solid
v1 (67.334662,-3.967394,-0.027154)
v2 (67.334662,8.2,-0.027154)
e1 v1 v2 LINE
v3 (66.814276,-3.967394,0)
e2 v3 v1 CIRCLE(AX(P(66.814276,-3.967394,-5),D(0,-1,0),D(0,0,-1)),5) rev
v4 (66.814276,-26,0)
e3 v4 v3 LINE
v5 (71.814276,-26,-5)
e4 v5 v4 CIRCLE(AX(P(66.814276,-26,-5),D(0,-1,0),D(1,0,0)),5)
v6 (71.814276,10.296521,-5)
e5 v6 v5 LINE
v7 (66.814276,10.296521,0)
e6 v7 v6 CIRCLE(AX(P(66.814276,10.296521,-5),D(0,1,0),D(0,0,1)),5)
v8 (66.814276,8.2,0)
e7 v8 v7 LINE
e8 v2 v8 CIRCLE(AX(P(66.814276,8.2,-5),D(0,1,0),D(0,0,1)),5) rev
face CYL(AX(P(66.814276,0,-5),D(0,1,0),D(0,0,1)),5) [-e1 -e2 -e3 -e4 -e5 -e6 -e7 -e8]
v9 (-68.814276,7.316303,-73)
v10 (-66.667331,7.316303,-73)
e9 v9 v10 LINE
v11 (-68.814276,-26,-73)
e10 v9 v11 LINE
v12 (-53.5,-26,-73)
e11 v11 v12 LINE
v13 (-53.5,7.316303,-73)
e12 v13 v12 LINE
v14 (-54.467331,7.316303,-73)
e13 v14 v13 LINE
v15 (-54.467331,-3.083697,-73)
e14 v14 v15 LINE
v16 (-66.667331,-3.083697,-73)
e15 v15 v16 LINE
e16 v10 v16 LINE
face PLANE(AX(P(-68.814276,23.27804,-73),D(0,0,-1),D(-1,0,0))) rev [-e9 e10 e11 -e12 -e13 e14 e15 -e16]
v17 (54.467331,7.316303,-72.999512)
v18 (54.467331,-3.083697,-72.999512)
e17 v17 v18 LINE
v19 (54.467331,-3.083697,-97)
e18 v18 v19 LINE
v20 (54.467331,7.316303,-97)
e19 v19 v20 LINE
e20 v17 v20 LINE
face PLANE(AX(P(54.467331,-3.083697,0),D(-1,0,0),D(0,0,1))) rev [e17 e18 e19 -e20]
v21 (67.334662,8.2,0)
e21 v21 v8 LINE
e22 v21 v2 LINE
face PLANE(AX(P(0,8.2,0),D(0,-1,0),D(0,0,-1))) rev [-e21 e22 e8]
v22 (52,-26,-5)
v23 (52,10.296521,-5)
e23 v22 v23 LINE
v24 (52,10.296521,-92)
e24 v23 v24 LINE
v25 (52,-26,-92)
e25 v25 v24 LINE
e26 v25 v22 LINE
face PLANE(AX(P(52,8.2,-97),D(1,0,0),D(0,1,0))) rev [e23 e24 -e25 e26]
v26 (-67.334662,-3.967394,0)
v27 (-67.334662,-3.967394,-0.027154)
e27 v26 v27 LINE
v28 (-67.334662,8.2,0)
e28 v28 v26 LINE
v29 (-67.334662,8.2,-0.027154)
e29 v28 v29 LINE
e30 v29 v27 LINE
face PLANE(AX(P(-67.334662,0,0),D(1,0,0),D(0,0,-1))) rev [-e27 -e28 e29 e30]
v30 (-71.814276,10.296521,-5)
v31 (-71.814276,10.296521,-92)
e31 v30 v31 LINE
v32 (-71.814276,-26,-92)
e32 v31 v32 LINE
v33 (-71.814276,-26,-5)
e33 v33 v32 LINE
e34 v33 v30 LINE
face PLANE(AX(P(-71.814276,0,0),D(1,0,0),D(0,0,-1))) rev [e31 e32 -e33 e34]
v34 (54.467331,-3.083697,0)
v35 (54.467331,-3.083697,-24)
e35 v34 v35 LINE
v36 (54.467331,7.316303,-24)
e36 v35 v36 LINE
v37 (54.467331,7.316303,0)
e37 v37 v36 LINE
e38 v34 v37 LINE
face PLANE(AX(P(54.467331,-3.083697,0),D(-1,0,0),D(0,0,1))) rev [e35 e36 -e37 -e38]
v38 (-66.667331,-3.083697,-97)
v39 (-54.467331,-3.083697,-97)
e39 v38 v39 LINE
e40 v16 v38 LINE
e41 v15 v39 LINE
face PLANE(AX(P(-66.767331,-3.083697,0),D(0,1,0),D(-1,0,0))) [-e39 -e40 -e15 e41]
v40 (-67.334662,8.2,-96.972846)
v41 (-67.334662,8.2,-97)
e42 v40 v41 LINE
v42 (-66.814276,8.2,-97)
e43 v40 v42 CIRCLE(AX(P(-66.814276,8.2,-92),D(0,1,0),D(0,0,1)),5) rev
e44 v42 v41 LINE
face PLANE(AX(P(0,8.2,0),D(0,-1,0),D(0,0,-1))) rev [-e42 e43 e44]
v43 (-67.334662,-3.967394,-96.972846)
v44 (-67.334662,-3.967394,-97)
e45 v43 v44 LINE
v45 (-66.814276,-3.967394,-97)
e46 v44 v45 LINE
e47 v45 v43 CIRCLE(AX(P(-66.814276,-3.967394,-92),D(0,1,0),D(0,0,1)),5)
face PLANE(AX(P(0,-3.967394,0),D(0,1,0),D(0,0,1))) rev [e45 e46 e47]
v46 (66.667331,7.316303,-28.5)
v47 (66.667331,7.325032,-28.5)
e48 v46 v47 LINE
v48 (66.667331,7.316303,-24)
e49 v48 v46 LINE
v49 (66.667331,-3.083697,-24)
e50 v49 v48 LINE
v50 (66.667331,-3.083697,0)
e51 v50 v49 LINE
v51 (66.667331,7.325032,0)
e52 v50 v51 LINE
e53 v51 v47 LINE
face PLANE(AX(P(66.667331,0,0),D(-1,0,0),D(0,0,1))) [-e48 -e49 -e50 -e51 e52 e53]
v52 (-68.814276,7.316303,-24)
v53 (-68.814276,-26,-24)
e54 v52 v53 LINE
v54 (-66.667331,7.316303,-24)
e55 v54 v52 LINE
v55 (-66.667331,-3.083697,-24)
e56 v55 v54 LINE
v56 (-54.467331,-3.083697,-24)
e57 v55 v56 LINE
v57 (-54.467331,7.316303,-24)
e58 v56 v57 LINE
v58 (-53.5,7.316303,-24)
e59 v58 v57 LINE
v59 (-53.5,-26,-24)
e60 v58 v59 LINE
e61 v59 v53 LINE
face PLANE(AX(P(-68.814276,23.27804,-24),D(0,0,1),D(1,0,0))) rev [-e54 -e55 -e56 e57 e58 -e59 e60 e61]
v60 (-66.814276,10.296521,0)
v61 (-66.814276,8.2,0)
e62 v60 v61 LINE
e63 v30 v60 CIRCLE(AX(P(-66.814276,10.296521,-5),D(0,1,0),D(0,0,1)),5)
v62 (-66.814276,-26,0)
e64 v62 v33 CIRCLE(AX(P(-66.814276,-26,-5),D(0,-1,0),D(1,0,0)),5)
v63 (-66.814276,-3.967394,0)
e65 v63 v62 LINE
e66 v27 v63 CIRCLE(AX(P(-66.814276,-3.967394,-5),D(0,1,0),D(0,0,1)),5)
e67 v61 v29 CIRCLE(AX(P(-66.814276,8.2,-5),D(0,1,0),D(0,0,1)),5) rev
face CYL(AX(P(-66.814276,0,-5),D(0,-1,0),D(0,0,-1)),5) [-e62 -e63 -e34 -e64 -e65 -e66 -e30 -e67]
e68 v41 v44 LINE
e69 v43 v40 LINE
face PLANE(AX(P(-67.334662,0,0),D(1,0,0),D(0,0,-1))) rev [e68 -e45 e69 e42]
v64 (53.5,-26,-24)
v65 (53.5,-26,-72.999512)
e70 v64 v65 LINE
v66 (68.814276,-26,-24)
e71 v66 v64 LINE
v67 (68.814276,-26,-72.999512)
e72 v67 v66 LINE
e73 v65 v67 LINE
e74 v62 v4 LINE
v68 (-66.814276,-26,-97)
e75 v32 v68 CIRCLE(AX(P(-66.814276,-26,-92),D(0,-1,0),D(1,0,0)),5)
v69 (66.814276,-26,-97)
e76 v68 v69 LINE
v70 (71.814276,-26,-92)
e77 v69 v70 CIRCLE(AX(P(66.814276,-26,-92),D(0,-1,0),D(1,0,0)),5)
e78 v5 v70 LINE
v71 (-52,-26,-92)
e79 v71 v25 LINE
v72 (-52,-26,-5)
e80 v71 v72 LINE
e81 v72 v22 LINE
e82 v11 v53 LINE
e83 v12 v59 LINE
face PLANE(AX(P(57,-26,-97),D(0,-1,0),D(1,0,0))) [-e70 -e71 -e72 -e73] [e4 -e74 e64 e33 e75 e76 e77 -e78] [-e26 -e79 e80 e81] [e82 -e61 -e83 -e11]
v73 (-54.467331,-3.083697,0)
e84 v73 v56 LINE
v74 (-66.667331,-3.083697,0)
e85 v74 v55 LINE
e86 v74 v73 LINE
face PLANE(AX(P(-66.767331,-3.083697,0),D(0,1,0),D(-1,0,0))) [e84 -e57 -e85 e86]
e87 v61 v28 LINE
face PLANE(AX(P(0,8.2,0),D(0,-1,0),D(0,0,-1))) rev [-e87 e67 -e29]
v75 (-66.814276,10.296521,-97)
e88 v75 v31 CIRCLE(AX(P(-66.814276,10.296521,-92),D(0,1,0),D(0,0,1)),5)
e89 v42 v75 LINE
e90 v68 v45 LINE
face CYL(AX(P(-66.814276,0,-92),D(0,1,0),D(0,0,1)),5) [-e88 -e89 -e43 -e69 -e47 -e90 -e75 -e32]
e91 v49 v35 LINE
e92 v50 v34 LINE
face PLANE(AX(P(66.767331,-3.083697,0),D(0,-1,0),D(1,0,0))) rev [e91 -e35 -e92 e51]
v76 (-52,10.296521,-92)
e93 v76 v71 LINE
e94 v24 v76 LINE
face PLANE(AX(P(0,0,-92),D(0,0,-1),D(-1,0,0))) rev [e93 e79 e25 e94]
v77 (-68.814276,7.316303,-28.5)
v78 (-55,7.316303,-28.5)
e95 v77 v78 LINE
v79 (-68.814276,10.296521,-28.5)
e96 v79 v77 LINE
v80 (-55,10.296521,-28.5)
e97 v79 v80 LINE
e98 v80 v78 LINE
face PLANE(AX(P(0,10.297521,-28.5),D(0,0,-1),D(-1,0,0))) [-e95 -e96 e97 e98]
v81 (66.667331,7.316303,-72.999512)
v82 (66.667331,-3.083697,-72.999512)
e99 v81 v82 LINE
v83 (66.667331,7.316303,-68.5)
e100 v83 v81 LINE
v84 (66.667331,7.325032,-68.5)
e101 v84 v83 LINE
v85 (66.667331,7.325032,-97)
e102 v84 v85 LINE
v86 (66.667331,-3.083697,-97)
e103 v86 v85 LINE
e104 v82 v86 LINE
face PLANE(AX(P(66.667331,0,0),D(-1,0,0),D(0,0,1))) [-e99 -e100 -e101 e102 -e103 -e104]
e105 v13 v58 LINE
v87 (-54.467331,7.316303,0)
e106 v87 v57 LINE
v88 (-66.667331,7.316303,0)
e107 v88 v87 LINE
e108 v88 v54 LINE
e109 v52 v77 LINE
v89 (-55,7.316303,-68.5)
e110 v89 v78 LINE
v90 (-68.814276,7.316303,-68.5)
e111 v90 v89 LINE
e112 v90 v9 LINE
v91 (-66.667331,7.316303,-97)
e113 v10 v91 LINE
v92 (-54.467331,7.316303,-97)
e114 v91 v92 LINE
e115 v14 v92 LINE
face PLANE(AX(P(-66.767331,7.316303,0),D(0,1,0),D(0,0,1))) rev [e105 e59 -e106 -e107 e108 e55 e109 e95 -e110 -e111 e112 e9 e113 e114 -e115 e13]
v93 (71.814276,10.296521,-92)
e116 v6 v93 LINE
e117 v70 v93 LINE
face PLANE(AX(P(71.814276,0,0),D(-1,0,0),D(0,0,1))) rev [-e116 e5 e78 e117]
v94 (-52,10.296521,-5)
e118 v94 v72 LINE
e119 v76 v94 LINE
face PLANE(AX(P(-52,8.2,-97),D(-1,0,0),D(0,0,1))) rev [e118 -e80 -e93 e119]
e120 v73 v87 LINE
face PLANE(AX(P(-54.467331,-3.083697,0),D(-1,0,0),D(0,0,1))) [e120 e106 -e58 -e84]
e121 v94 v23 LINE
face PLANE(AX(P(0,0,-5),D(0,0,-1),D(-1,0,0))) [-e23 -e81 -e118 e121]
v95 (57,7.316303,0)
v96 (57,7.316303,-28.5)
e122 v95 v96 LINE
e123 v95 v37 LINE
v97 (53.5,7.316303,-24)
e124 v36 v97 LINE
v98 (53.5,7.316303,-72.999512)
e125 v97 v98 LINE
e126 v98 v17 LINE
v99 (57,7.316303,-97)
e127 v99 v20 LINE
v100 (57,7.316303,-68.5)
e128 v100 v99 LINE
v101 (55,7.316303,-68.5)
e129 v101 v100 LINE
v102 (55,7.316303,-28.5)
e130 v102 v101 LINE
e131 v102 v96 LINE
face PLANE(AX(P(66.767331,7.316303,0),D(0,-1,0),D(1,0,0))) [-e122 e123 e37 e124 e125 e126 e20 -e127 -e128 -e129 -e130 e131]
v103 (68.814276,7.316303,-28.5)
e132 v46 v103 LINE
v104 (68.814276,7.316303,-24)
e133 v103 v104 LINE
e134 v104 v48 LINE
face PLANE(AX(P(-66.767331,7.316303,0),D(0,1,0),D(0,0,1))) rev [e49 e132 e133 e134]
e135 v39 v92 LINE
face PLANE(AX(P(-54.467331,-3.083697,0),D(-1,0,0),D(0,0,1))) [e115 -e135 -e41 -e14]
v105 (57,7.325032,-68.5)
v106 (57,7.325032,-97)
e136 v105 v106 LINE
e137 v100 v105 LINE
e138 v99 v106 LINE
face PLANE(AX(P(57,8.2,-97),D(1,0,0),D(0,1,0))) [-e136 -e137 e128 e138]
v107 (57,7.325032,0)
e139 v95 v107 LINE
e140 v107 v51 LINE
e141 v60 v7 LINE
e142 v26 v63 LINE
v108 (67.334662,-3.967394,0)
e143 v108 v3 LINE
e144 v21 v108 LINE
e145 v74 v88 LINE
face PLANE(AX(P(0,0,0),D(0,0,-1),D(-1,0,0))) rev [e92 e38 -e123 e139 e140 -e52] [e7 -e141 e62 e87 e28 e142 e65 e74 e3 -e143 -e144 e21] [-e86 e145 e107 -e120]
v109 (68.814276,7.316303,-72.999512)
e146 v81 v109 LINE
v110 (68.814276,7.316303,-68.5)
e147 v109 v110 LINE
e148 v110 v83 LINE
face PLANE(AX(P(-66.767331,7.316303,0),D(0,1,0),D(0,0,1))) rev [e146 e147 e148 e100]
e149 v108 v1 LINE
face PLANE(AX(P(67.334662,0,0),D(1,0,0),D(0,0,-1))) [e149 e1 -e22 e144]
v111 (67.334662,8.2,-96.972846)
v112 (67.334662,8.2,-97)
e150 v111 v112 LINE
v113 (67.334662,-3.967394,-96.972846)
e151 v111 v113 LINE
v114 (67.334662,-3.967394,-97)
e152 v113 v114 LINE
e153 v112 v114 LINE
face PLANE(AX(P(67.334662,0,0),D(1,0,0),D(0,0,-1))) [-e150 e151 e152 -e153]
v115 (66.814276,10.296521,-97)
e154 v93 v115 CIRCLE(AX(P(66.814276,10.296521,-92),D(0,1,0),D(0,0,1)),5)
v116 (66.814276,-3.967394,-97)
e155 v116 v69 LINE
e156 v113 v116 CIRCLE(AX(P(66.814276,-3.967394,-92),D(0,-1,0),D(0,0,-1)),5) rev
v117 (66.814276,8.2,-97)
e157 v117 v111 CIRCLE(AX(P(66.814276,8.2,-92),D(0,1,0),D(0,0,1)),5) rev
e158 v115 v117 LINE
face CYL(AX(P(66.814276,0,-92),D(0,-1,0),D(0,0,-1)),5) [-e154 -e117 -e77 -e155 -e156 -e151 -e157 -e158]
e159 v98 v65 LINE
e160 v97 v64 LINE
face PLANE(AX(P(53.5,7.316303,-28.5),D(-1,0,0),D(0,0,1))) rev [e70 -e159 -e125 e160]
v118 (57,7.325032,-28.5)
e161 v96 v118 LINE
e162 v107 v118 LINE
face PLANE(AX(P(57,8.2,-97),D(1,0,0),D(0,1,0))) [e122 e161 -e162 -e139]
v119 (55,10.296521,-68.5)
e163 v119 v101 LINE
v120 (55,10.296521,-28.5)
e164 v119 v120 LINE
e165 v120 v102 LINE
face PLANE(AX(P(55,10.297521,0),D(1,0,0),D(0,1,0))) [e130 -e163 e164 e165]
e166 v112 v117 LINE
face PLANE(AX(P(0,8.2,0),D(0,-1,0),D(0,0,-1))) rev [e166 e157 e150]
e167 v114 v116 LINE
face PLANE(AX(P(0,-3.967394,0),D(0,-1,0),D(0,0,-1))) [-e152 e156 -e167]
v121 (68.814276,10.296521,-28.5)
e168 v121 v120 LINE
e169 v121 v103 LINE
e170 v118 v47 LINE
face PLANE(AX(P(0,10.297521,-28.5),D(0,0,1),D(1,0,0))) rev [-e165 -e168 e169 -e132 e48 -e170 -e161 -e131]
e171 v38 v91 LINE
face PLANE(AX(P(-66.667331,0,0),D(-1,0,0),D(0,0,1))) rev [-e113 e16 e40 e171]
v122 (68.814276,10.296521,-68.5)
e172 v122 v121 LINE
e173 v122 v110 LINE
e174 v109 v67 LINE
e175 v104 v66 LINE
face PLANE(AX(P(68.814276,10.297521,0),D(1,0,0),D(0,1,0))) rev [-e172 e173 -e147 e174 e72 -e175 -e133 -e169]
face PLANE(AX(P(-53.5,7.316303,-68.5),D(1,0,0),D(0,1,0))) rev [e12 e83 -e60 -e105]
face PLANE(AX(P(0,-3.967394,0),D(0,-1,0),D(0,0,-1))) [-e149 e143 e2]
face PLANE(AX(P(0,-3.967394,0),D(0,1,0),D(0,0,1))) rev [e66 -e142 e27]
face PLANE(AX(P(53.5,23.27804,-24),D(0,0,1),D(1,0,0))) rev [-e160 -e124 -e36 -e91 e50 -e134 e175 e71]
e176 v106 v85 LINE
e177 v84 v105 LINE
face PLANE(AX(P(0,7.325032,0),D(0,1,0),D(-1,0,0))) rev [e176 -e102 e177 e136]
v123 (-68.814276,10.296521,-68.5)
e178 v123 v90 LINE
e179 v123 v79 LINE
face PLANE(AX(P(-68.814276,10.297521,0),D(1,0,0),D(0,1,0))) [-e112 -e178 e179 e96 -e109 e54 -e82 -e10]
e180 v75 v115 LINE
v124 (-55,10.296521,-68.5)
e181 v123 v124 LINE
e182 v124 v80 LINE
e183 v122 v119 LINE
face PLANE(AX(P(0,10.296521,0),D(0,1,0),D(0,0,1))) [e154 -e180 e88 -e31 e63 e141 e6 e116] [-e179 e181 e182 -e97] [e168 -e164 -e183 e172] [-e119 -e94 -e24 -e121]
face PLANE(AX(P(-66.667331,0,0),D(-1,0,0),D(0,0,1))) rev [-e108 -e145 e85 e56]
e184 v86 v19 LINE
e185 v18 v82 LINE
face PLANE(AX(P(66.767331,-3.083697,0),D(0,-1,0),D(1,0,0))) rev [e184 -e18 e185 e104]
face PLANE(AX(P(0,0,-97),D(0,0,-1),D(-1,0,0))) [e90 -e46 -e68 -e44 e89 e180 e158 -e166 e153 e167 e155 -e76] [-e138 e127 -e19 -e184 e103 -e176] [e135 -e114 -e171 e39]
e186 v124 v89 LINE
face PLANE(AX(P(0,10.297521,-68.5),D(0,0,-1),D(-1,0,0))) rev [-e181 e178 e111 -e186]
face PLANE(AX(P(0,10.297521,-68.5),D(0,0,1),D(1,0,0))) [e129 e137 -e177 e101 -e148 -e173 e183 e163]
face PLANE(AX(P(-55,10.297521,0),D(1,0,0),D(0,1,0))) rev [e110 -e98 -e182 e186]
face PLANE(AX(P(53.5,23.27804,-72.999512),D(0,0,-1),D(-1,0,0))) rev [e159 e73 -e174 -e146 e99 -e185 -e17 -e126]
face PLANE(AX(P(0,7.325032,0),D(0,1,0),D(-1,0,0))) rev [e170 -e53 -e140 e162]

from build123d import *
from build123d.topology import SkipClean

# Parameters (mm, degrees)
CROQUIS1_W              = 114
CROQUIS1_H              = 34.2
SALIENTE_EXTRUIR1_DEPTH = 97
VACIADO1_T              = -5
SALIENTE_EXTRUIR2_DEPTH = 97
CORTAR_EXTRUIR1_REACH   = 128.031
CROQUIS3_W              = 13.814275766
CROQUIS3_H              = 40
REDONDEO2_R             = 5
CROQUIS6_W              = 12.3
CROQUIS6_H              = 10.4
CORTAR_EXTRUIR3_DEPTH   = 124.459670354
SALIENTE_EXTRUIR3_DEPTH = 97
CROQUIS8_W              = 13.814275766
CROQUIS8_H              = 40
CORTAR_EXTRUIR4_DEPTH   = 127.030661617
CROQUIS9_W              = 104
CROQUIS9_H              = 87
CORTAR_EXTRUIR5_DEPTH   = 10
CORTAR_EXTRUIR6_START   = -33.316303
CROQUIS11_W             = 1.5
CROQUIS11_H             = 39.999512223
CROQUIS11_H_2           = 40
CORTAR_EXTRUIR6_DEPTH   = 33.316303
CORTAR_EXTRUIR7_START   = -33.316303
CROQUIS13_W             = 15.314275766
CROQUIS13_H             = 4.5
CORTAR_EXTRUIR7_DEPTH   = 33.316303


with BuildPart() as part:
    # Croquis1 → Saliente-Extruir1 (new body)
    with BuildSketch(Plane.XY):
        with Locations((0, -8.9)):
            Rectangle(CROQUIS1_W, CROQUIS1_H)
    extrude(amount=-SALIENTE_EXTRUIR1_DEPTH)

    # Vaciado1
    vaciado1_openings = [part.faces().sort_by_distance(p)[0] for p in [
        (0, -26, -48.5),
    ]]
    offset(amount=VACIADO1_T, openings=vaciado1_openings, kind=Kind.INTERSECTION)

    # Croquis2 → Saliente-Extruir2 (add, through all)
    with BuildSketch(Plane(origin=(0, 0, -97), x_dir=(-1, 0, 0), z_dir=(0, 0, -1))):
        Polygon((71.814275766, 8.2), (67.33466189, 8.2), (67.33466189, -3.967393508), (57, -3.967393508), (57, -26), (67.33466189, -26), (71.814275766, -26), align=None)
        Polygon((-57, 8.2), (57, 8.2), (67.33466189, 8.2), (71.814275766, 8.2), (71.814275766, 10.296521374), (-71.814275766, 10.296521374), (-71.814275766, 8.2), (-67.33466189, 8.2), align=None)
        Polygon((-67.33466189, -3.967393508), (-67.33466189, 8.2), (-71.814275766, 8.2), (-71.814275766, -26), (-67.33466189, -26), (-57, -26), (-57, -3.967393508), align=None)
    extrude(amount=-SALIENTE_EXTRUIR2_DEPTH)

    # Croquis3 → Cortar-Extruir1 (cut, up to next)
    with BuildSketch(Plane.XZ.offset(26), mode=Mode.PRIVATE) as cortar_extruir1_sk1:
        with Locations((-61.907137883, -48.5)):
            Rectangle(CROQUIS3_W, CROQUIS3_H)
    cortar_extruir1_tool1 = extrude(cortar_extruir1_sk1.sketch, amount=-CORTAR_EXTRUIR1_REACH, mode=Mode.PRIVATE) & part.part
    # Croquis3 → Cortar-Extruir1 (cut, up to next)
    with BuildSketch(Plane.XZ.offset(26), mode=Mode.PRIVATE) as cortar_extruir1_sk2:
        with Locations((61.907137883, -48.5)):
            Rectangle(CROQUIS3_W, CROQUIS3_H)
    cortar_extruir1_tool2 = extrude(cortar_extruir1_sk2.sketch, amount=-CORTAR_EXTRUIR1_REACH, mode=Mode.PRIVATE) & part.part
    add(cortar_extruir1_tool1.solids().sort_by_distance((-61.907138, -26, -48.5))[0], mode=Mode.SUBTRACT)
    add(cortar_extruir1_tool2.solids().sort_by_distance((61.907138, -26, -48.5))[0], mode=Mode.SUBTRACT)

    # Redondeo2
    # the kernel refuses this fillet: 5 mm, written as the material it takes off along each edge
    with BuildSketch(Plane(origin=(71.814275766, -38.5, -97), x_dir=(0, 0, 1), z_dir=(0, 1, 0)), Plane(origin=(71.814275766, -38.5, 0), x_dir=(-1, 0, 0), z_dir=(0, 1, 0)), Plane(origin=(-71.814275766, 22.796521374, -97), x_dir=(0, 0, 1), z_dir=(0, -1, 0)), Plane(origin=(-71.814275766, 22.796521374, 0), x_dir=(1, 0, 0), z_dir=(0, -1, 0))) as redondeo2_piece_1:
        with BuildLine():
            CenterArc((REDONDEO2_R, -REDONDEO2_R), REDONDEO2_R, 90, 90)
            Line((0, -REDONDEO2_R), (0, 0))
            Line((0, 0), (REDONDEO2_R, 0))
        make_face()
    extrude(amount=61.296521374, mode=Mode.SUBTRACT)

    # Croquis6 → Cortar-Extruir3 (cut, through all)
    with BuildSketch(Plane(origin=(0, 0, -97), x_dir=(-1, 0, 0), z_dir=(0, 0, -1))):
        with Locations((-60.617330945, 2.116303246)):
            Rectangle(CROQUIS6_W, CROQUIS6_H)
        with Locations((60.617330945, 2.116303246)):
            Rectangle(CROQUIS6_W, CROQUIS6_H)
    extrude(amount=-CORTAR_EXTRUIR3_DEPTH, mode=Mode.SUBTRACT)

    # Croquis7 → Saliente-Extruir3 (add, through all)
    with BuildSketch(Plane(origin=(0, 0, -97), x_dir=(-1, 0, 0), z_dir=(0, 0, -1))):
        Polygon((57, 8.2), (57, 7.316303246), (66.667330945, 7.316303246), (66.667330945, -3.083696754), (57, -3.083696754), (57, -3.967393508), (66.814275766, -3.967393508), (67.33466189, -3.967393508), (67.33466189, 8.2), (66.814275766, 8.2), align=None)
        Polygon((-66.667330945, 7.32503221), (-57, 7.32503221), (-57, 8.2), (-66.814275766, 8.2), (-67.33466189, 8.2), (-67.33466189, -3.967393508), (-66.814275766, -3.967393508), (-57, -3.967393508), (-57, -3.083696754), (-66.667330945, -3.083696754), align=None)
    extrude(amount=-SALIENTE_EXTRUIR3_DEPTH)

    # Croquis8 → Cortar-Extruir4 (cut, through all)
    with BuildSketch(Plane(origin=(0, 10.296521374, 0), x_dir=(1, 0, 0), z_dir=(0, 1, 0))):
        with Locations((-61.907137883, 48.5)):
            Rectangle(CROQUIS8_W, CROQUIS8_H)
        with Locations((61.907137883, 48.5)):
            Rectangle(CROQUIS8_W, CROQUIS8_H)
    extrude(amount=-CORTAR_EXTRUIR4_DEPTH, mode=Mode.SUBTRACT)

    # Croquis9 → Cortar-Extruir5 (cut)
    with BuildSketch(Plane.XZ.offset(-3.2)):
        with Locations((0, -48.5)):
            Rectangle(CROQUIS9_W, CROQUIS9_H)
    extrude(amount=-CORTAR_EXTRUIR5_DEPTH, mode=Mode.SUBTRACT)

    # Croquis11 → Cortar-Extruir6 (cut)
    with SkipClean():  # the faces are left unmerged after this step: merging them gives an invalid solid
        with BuildSketch(Plane.XZ.offset(26).offset(CORTAR_EXTRUIR6_START)):
            with Locations((54.25, -48.499756112)):
                Rectangle(CROQUIS11_W, CROQUIS11_H)
            with Locations((-54.25, -48.5)):
                Rectangle(CROQUIS11_W, CROQUIS11_H_2)
        extrude(amount=CORTAR_EXTRUIR6_DEPTH, mode=Mode.SUBTRACT)

    # Croquis13 → Cortar-Extruir7 (cut)
    with BuildSketch(Plane.XZ.offset(26).offset(CORTAR_EXTRUIR7_START)):
        with Locations((-61.157137883, -26.25)):
            Rectangle(CROQUIS13_W, CROQUIS13_H)
        with Locations((-61.157137883, -70.75)):
            Rectangle(CROQUIS13_W, CROQUIS13_H)
        with Locations((61.157137883, -26.25)):
            Rectangle(CROQUIS13_W, CROQUIS13_H)
        with Locations((61.157137883, -70.749512223)):
            Rectangle(CROQUIS13_W, CROQUIS13_H)
    extrude(amount=CORTAR_EXTRUIR7_DEPTH, mode=Mode.SUBTRACT)


solid = part.part
